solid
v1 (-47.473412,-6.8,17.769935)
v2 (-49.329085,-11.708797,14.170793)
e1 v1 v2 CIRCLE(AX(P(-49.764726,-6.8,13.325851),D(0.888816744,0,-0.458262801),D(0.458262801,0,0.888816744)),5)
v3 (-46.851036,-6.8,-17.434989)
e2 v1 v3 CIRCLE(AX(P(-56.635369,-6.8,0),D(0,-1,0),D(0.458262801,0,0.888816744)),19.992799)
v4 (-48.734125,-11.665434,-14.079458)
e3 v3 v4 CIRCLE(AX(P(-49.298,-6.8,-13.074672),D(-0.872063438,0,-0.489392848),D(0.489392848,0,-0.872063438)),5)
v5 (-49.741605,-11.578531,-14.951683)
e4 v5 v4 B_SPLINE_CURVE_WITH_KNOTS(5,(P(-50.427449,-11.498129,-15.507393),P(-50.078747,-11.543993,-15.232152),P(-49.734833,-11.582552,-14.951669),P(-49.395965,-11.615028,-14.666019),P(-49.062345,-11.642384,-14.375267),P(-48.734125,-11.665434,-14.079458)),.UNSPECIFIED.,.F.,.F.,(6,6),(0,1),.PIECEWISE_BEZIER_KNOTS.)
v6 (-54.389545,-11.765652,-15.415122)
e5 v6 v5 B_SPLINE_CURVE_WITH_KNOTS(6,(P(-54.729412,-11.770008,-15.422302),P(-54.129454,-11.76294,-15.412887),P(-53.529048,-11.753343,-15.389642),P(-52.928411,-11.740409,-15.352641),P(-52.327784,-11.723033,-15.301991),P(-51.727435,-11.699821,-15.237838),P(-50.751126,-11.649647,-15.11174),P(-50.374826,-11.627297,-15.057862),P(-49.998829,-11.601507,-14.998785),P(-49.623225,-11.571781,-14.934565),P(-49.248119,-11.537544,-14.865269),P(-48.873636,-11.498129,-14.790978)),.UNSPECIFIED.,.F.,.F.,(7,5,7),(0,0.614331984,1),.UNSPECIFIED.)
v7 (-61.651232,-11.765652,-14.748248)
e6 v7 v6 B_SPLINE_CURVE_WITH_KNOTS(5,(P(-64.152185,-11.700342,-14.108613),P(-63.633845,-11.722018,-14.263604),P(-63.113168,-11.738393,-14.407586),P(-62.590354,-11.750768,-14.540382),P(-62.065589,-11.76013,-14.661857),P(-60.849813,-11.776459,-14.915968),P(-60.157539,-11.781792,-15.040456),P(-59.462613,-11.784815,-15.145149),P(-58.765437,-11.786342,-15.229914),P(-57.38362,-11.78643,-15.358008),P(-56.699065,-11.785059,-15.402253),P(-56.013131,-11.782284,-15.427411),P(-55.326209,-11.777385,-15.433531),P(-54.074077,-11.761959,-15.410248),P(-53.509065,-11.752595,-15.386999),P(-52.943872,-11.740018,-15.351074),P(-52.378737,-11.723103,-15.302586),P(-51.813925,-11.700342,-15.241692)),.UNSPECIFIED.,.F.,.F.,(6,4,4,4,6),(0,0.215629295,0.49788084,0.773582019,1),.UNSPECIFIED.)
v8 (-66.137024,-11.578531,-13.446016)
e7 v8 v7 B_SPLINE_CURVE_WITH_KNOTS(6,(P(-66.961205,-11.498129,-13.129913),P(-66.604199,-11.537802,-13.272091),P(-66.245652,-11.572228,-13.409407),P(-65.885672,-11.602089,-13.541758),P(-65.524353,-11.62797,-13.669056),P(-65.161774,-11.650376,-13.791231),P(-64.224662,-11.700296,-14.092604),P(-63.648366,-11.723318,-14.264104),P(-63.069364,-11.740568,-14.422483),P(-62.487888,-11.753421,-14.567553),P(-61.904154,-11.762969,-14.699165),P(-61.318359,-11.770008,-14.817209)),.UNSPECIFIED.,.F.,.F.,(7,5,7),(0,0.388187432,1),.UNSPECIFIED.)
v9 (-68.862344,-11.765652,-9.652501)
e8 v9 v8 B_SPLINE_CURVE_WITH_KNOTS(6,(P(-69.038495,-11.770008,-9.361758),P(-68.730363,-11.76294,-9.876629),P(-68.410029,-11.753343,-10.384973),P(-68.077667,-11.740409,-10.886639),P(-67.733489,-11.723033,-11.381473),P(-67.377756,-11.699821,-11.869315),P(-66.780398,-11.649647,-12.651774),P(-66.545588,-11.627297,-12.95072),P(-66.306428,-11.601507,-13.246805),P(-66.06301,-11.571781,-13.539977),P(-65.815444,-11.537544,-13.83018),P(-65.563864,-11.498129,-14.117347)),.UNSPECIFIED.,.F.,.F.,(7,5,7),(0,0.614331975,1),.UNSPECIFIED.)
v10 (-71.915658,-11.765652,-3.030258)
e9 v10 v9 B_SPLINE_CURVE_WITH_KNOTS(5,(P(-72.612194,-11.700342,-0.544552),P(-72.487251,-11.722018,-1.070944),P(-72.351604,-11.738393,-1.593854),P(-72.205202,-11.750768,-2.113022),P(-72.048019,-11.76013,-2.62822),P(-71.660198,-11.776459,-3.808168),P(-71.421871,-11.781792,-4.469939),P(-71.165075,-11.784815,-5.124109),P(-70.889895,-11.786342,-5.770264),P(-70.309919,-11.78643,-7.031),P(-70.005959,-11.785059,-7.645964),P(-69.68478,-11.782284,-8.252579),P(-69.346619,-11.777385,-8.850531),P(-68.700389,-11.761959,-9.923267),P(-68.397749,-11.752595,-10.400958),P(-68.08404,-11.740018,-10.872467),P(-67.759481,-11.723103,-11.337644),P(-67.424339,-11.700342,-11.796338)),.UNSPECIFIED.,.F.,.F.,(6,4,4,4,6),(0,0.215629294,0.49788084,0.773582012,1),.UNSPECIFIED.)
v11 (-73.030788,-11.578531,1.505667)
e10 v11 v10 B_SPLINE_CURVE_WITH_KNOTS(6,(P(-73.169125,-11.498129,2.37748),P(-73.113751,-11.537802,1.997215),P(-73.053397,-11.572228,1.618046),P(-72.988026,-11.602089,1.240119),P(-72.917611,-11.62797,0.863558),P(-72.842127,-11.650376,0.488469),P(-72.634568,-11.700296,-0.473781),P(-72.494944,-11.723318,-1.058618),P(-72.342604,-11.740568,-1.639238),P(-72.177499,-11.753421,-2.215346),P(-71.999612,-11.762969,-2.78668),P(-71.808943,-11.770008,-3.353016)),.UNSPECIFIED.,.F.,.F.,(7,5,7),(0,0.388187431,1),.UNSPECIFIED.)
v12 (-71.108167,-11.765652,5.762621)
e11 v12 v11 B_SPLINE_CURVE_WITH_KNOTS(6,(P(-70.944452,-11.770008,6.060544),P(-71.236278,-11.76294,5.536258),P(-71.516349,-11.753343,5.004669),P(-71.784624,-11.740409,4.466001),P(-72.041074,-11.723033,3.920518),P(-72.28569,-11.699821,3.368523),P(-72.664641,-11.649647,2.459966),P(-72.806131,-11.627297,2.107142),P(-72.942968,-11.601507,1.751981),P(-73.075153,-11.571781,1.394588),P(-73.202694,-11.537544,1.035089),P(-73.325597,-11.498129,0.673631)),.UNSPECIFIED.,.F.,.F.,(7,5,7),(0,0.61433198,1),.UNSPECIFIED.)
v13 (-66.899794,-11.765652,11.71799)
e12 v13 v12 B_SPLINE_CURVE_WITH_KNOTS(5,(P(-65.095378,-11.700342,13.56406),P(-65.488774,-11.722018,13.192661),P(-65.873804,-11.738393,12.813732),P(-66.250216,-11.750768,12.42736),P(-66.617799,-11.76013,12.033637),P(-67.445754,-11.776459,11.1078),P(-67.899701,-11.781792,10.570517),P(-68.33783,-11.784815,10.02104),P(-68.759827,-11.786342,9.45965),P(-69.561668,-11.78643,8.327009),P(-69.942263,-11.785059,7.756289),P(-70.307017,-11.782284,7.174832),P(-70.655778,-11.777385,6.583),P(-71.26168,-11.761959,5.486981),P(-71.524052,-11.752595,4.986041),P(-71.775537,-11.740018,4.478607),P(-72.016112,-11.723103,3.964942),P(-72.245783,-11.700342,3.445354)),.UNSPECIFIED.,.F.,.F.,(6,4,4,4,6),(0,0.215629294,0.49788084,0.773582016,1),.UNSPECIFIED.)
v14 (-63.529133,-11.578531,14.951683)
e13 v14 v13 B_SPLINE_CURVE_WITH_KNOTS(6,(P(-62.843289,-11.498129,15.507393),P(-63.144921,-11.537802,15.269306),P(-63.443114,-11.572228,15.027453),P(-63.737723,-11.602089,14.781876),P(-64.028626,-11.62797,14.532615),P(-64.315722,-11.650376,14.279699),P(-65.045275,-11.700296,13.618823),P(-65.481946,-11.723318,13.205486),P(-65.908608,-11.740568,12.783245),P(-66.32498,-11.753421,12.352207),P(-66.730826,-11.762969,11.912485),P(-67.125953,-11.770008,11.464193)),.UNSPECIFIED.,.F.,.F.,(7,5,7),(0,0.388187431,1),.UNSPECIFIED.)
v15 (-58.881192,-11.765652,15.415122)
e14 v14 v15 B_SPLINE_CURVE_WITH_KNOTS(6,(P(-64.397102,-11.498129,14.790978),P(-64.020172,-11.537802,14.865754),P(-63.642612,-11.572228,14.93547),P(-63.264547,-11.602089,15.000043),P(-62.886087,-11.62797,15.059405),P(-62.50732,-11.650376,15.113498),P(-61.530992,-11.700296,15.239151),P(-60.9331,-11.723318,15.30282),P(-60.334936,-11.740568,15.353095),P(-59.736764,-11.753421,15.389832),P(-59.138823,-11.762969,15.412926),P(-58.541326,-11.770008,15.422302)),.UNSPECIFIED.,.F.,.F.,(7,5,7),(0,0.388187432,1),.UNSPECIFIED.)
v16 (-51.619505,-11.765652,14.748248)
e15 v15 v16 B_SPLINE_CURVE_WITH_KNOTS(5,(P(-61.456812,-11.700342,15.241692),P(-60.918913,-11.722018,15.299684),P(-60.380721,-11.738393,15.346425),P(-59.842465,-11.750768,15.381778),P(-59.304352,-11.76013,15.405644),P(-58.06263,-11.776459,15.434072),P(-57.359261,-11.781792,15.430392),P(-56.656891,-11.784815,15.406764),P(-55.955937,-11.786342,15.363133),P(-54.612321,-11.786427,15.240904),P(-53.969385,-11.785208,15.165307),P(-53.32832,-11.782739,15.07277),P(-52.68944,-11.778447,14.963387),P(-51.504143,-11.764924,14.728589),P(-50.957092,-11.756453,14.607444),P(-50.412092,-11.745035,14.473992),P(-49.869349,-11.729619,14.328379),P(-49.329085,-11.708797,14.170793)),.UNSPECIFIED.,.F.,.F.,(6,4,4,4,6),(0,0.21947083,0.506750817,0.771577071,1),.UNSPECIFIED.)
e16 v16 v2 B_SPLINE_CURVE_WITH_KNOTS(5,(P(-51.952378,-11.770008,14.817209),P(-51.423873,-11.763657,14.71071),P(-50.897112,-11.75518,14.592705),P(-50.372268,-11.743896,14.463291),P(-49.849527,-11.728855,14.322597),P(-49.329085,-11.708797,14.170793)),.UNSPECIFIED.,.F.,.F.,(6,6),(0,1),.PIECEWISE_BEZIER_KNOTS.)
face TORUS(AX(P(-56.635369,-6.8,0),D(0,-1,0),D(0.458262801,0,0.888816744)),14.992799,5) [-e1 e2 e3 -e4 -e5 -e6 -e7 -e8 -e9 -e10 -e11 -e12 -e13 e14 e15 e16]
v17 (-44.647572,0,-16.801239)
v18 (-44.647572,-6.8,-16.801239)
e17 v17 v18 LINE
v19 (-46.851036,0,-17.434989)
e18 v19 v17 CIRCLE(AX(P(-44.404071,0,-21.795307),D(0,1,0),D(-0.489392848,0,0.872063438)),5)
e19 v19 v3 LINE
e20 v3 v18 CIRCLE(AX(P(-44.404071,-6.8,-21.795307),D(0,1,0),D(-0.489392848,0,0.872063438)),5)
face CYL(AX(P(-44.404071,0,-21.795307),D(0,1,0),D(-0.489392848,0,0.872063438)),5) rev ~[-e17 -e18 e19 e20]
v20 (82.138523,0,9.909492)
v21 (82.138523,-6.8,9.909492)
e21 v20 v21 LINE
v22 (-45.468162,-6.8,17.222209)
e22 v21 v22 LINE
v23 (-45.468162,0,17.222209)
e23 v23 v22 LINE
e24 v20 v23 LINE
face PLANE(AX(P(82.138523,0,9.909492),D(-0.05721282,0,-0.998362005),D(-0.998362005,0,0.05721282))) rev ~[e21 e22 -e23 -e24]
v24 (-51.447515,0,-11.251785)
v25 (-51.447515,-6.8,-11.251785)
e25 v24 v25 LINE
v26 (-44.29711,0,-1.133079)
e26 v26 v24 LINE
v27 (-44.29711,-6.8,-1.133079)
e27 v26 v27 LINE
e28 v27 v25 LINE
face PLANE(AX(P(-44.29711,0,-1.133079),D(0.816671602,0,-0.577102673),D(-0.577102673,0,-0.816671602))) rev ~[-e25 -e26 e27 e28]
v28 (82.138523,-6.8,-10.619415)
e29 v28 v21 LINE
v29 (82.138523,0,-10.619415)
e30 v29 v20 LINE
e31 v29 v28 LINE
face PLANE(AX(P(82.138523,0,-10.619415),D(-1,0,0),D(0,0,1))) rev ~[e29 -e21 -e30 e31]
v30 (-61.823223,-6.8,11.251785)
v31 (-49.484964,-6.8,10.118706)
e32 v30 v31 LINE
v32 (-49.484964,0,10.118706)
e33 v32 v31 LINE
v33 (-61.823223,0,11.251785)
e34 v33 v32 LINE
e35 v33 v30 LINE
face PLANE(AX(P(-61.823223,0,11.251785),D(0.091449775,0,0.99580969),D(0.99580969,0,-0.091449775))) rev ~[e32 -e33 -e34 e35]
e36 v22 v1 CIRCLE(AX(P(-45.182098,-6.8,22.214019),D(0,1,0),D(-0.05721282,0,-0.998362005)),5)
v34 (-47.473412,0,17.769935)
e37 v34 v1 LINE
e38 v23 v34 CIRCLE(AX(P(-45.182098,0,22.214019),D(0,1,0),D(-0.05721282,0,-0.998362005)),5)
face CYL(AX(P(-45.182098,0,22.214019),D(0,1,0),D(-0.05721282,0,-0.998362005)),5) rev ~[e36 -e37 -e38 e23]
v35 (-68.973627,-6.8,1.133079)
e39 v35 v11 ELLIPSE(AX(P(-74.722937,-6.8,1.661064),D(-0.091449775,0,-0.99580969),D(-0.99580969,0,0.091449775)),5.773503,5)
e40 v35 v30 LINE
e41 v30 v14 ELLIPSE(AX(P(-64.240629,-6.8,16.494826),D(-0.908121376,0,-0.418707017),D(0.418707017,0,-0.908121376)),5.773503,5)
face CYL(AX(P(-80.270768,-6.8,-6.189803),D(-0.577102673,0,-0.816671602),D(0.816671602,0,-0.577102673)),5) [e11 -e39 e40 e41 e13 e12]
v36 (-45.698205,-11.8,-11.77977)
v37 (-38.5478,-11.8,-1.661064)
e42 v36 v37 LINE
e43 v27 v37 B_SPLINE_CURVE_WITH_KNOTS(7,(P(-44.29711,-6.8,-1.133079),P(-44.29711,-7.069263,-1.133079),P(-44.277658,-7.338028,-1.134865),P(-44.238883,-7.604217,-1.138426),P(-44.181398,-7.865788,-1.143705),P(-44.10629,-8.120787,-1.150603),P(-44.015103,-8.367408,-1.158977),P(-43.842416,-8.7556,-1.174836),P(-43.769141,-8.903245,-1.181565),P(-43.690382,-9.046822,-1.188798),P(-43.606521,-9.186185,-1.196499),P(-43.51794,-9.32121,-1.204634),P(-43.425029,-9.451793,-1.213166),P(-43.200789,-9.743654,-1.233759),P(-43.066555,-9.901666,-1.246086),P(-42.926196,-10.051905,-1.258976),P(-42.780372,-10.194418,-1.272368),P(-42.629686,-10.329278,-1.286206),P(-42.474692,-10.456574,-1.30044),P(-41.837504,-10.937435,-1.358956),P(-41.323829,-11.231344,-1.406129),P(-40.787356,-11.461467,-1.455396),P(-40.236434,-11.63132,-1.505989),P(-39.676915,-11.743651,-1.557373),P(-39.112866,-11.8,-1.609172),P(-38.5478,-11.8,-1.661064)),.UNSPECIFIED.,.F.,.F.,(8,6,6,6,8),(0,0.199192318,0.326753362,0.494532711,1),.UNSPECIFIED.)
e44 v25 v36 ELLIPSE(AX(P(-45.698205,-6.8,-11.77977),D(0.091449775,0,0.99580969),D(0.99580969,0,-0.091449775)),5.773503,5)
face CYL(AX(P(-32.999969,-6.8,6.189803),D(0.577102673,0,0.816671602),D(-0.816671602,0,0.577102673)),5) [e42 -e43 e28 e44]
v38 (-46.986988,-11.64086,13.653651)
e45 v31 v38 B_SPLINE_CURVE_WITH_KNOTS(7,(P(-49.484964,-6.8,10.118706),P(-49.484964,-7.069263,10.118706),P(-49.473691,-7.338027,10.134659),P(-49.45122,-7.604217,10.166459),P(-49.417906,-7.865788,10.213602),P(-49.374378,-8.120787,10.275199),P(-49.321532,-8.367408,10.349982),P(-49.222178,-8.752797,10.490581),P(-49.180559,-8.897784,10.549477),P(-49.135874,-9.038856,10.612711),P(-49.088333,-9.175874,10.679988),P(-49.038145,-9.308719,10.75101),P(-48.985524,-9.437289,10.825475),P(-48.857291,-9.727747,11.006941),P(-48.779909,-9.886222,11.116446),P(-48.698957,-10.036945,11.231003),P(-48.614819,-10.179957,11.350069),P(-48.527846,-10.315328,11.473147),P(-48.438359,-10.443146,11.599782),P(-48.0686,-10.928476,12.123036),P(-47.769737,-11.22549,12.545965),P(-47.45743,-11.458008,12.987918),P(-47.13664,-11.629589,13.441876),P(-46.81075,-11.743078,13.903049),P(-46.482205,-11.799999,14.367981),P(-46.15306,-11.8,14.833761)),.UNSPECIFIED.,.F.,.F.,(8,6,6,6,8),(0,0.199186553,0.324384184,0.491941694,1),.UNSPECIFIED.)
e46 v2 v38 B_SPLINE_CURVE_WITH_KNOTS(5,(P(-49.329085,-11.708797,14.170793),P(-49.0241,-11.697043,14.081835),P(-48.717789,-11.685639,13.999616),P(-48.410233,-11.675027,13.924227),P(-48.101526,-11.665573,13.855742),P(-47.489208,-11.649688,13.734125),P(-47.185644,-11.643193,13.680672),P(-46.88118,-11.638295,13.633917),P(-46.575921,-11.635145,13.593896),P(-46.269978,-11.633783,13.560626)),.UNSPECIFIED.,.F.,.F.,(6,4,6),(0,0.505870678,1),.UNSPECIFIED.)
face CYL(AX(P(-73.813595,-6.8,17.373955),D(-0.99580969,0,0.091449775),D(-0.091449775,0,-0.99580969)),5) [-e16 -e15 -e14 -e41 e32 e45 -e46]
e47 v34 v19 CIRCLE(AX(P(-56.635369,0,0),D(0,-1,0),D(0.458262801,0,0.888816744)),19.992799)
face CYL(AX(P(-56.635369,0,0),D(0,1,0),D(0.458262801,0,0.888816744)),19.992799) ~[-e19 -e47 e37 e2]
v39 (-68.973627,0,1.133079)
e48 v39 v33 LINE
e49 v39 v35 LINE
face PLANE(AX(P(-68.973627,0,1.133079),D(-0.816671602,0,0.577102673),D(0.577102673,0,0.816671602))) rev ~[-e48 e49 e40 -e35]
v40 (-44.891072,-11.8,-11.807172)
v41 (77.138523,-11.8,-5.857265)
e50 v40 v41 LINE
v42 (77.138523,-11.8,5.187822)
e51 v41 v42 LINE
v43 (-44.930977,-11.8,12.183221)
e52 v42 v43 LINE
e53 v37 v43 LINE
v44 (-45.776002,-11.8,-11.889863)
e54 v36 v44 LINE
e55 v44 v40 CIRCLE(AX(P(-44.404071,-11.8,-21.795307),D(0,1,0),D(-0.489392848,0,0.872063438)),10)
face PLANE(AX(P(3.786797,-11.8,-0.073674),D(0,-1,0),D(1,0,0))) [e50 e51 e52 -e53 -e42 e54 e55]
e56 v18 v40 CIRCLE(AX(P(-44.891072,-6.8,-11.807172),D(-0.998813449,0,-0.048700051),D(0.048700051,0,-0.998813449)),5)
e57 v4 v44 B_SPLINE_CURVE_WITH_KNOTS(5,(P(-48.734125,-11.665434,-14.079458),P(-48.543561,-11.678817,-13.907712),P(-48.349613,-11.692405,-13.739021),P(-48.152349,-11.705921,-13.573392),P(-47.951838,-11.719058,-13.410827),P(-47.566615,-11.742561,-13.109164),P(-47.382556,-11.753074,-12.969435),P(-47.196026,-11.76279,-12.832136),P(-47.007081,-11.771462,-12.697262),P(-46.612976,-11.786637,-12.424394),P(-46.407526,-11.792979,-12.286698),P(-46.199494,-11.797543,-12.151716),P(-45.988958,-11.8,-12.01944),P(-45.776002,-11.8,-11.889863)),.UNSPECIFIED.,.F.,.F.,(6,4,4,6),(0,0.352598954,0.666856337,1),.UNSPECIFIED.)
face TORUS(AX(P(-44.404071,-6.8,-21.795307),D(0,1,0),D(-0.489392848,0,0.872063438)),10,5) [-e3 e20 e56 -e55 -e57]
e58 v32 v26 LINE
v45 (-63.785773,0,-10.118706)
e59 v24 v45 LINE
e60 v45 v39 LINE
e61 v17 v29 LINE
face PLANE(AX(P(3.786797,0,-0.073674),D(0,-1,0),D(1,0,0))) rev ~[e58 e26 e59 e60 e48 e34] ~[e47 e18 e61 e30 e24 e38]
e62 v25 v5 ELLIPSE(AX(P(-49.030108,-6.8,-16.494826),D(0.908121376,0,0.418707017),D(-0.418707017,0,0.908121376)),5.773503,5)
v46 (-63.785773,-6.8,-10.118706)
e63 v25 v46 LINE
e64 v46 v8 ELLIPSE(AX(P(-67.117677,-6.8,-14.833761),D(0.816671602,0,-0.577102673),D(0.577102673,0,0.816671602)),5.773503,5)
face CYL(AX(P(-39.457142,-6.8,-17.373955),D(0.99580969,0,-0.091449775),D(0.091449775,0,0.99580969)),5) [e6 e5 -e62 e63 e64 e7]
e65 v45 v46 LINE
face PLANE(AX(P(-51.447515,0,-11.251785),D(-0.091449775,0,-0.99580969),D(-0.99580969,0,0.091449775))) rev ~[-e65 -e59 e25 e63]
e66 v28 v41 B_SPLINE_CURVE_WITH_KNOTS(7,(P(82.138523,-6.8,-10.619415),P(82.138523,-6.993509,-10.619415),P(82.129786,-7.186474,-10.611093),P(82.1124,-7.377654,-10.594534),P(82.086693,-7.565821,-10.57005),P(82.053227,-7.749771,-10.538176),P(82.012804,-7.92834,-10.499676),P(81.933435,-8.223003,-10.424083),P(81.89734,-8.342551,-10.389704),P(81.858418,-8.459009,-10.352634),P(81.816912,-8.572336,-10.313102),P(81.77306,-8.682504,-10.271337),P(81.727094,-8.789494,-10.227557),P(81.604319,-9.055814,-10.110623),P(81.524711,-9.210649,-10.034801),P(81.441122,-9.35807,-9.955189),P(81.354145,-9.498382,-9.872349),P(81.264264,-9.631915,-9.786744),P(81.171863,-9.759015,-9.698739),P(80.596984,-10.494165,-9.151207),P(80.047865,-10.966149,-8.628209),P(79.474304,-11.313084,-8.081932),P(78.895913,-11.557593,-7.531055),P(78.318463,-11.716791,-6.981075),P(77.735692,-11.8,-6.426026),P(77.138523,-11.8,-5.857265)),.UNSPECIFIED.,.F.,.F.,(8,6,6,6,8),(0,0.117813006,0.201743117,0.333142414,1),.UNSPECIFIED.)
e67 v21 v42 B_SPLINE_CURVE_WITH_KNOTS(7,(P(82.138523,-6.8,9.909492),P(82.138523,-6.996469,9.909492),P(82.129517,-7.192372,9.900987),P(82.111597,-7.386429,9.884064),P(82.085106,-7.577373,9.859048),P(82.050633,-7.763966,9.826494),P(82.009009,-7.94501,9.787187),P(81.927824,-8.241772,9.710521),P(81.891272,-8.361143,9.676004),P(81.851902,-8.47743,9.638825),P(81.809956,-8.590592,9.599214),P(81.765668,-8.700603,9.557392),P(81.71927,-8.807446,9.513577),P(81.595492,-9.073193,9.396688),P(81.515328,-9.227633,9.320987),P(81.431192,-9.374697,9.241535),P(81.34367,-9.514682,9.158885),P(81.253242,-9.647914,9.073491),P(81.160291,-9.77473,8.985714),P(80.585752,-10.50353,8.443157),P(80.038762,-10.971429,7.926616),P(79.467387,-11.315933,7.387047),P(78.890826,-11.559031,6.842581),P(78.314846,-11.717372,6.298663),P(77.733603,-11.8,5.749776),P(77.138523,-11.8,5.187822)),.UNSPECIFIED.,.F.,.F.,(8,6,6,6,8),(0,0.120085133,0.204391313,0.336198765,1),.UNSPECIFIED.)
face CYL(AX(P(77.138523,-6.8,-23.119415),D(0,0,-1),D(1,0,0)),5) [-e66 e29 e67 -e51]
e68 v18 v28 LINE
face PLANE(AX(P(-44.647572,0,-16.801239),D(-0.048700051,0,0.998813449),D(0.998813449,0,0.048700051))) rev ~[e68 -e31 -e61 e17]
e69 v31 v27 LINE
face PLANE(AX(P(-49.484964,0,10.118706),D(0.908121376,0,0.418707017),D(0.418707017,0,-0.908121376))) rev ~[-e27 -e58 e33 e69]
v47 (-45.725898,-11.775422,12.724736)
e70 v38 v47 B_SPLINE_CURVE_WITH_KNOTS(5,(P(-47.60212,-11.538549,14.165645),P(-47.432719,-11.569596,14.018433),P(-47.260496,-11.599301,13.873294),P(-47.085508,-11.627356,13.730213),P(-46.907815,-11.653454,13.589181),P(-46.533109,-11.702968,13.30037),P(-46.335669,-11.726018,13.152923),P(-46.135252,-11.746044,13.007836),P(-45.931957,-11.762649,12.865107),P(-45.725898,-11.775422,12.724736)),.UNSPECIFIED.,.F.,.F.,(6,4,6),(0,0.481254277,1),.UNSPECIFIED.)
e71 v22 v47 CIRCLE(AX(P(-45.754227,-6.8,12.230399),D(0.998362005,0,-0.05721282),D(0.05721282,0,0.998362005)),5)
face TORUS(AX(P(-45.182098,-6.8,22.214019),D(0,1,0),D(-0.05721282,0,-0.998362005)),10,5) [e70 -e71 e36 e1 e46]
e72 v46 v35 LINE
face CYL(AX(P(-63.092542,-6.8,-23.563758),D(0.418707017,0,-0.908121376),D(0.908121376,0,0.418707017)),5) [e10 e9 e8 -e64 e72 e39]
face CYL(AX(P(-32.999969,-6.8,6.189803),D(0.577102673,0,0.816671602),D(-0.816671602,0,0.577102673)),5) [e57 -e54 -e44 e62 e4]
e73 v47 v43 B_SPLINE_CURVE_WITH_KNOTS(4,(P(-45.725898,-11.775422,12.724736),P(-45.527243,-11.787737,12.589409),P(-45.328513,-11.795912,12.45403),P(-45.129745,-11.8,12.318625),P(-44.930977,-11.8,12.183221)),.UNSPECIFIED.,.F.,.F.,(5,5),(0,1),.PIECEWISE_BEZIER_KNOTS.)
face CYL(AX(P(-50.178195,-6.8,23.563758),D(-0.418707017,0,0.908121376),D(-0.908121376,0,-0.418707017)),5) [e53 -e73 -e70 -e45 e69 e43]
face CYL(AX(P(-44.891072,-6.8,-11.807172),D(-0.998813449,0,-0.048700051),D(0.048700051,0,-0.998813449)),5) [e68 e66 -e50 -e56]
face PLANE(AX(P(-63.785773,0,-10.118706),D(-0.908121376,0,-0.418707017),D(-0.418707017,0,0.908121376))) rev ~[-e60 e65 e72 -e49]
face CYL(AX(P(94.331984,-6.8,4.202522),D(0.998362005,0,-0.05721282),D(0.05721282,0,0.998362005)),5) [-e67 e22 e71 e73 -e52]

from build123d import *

# Parameters (mm, degrees)
F1_DEPTH      = 11.8
F2_T3_ANGLE   = 23.9952218253
F2_T6_ANGLE   = 236.5757489995
F2_T9_ANGLE   = 26.5092715393
F2_T12_DEPTH  = 139.4367119933
F2_T15_DEPTH  = 45.5289069563
F2_T18_DEPTH  = 140.3160479541
F2_T21_DEPTH  = 37.3901770892
F2_T26_DEPTH  = 37.3901770892
F2_T31_DEPTH  = 37.3901770892
F2_T36_DEPTH  = 37.3901770892
F2_T41_DEPTH  = 37.3901770892
F2_T46_DEPTH  = 37.3901770892
F2_T52_DEPTH  = 37.3901770892
F2_T56_DEPTH  = 37.3901770892
F2_T62_DEPTH  = 37.3901770892
F2_T66_DEPTH  = 37.3901770892
F2_T72_DEPTH  = 37.3901770892
F2_T76_DEPTH  = 37.3901770892
F2_T82_DEPTH  = 37.3901770892
F2_T86_DEPTH  = 37.3901770892
F2_T92_DEPTH  = 37.3901770892
F2_T96_DEPTH  = 37.3901770892
F2_T102_DEPTH = 37.3901770892
F2_T106_DEPTH = 37.3901770892


# Not quite as in the source:
# - a fillet or chamfer that OpenCascade refuses, or shapes differently, is made with other operations: its cross-section is extruded or revolved along the edge and cut away or added


with BuildPart() as f1:
    # F0 (on Front) → F1 (new body)
    with BuildSketch(Plane.XZ):
        with BuildLine():
            ThreePointArc((-45.4681624589, 17.2222085509), (-46.4995658162, 17.3907127083), (-47.4734123647, 17.7699348549))
            ThreePointArc((-47.4734123647, 17.7699348549), (-76.6250444945, -0.3533911925), (-46.8510355825, -17.4349893659))
            ThreePointArc((-46.8510355825, -17.4349893659), (-45.7861203938, -16.9901072457), (-44.6475715962, -16.8012393137))
            Line((-44.6475715962, -16.8012393137), (82.1385234594, -10.6194149703))
            Line((82.1385234594, -10.6194149703), (82.1385234594, 9.909491986))
            Line((82.1385234594, 9.909491986), (-45.4681624589, 17.2222085509))
        make_face()
        Polygon((-49.4849642992, 10.1187057679), (-44.2971102089, -1.1330789012), (-51.4475145251, -11.2517846691), (-63.7857729316, -10.1187057679), (-68.9736270219, 1.1330789012), (-61.8232227057, 11.2517846691), align=None, mode=Mode.SUBTRACT)
    extrude(amount=F1_DEPTH)

    # F2: fillet of radius 5 on 12 edges, made by hand


with BuildPart() as f2_tool1:
    # F2_s2 → F2_t3 (revolve)
    with BuildSketch(Plane(origin=(-46.3030483671, 0, 2.6534743565), x_dir=(0, 1, 0), z_dir=(0.9983620051, 0, -0.0572128202))):
        with BuildLine():
            ThreePointArc((-6.8, 14.5926368593), (-10.3355339059, 13.1281707652), (-11.8, 9.5926368593))
            Line((-11.8, 9.5926368593), (-11.8, 14.5926368593))
            Line((-11.8, 14.5926368593), (-6.8, 14.5926368593))
        make_face()
    revolve(axis=Axis((-45.1820983581, -11.8, 22.2140185763), (0, 1, 0)), revolution_arc=F2_T3_ANGLE)


with BuildPart() as f2_tool4:
    # F2_s5 → F2_t6 (revolve)
    with BuildSketch(Plane(origin=(-44.7416696351, 0, 23.0682455015), x_dir=(0, 1, 0), z_dir=(0.8888167443, 0, -0.4582628013))):
        with BuildLine():
            ThreePointArc((-6.8, -5.9610832949), (-10.3355339059, -7.425549389), (-11.8, -10.9610832949))
            Line((-11.8, -10.9610832949), (-11.8, -5.9610832949))
            Line((-11.8, -5.9610832949), (-6.8, -5.9610832949))
        make_face()
    revolve(axis=Axis((-56.6353686154, -11.8, 0), (0, -1, 0)), revolution_arc=F2_T6_ANGLE)


with BuildPart() as f2_tool7:
    # F2_s8 → F2_t9 (revolve)
    with BuildSketch(Plane(origin=(-43.0708942729, 0, -24.1709337899), x_dir=(0, 1, 0), z_dir=(-0.8720634381, 0, -0.4893928482))):
        with BuildLine():
            ThreePointArc((-6.8, -7.7241449756), (-10.3355339059, -9.1886110696), (-11.8, -12.7241449756))
            Line((-11.8, -12.7241449756), (-11.8, -7.7241449756))
            Line((-11.8, -7.7241449756), (-6.8, -7.7241449756))
        make_face()
    revolve(axis=Axis((-44.4040713414, -11.8, -21.7953065565), (0, 1, 0)), revolution_arc=F2_T9_ANGLE)


with BuildPart() as f2_tool10:
    # F2_s11 → F2_t12 (new body)
    with BuildSketch(Plane(origin=(-45.3589315248, 0, -2.2116064618), x_dir=(0, 1, 0), z_dir=(0.9988134486, 0, 0.048700051))):
        with BuildLine():
            ThreePointArc((-6.8, -14.6069647669), (-10.3355339059, -13.1424986728), (-11.8, -9.6069647669))
            Line((-11.8, -9.6069647669), (-11.8, -14.6069647669))
            Line((-11.8, -14.6069647669), (-6.8, -14.6069647669))
        make_face()
    extrude(amount=F2_T12_DEPTH)


with BuildPart() as f2_tool13:
    # F2_s14 → F2_t15 (new body)
    with BuildSketch(Plane.XY.offset(-23.1194149703)):
        with BuildLine():
            ThreePointArc((82.1385234594, -6.8), (80.6740573654, -10.3355339059), (77.1385234594, -11.8))
            Line((77.1385234594, -11.8), (82.1385234594, -11.8))
            Line((82.1385234594, -11.8), (82.1385234594, -6.8))
        make_face()
    extrude(amount=F2_T15_DEPTH)


with BuildPart() as f2_tool16:
    # F2_s17 → F2_t18 (new body)
    with BuildSketch(Plane(origin=(93.7831626148, 0, -5.3744024604), x_dir=(0, 1, 0), z_dir=(-0.9983620051, 0, 0.0572128202))):
        with BuildLine():
            ThreePointArc((-6.8, -14.5926368593), (-10.3355339059, -13.1281707652), (-11.8, -9.5926368593))
            Line((-11.8, -9.5926368593), (-11.8, -14.5926368593))
            Line((-11.8, -14.5926368593), (-6.8, -14.5926368593))
        make_face()
    extrude(amount=F2_T18_DEPTH)


with BuildPart() as f2_tool19:
    # F2_s20 → F2_t21 (new body)
    with BuildSketch(Plane(origin=(-29.6512532209, 0, -41.9601876654), x_dir=(0, 1, 0), z_dir=(0.5771026729, 0, 0.8166716016))):
        with BuildLine():
            ThreePointArc((-6.8, 56.9827053125), (-10.3355339059, 58.4471714066), (-11.8, 61.9827053125))
            Line((-11.8, 61.9827053125), (-11.8, 56.9827053125))
            Line((-11.8, 56.9827053125), (-6.8, 56.9827053125))
        make_face()
    extrude(amount=F2_T21_DEPTH)

    split(bisect_by=Plane(origin=(-56.450638263, 0, -26.0276643418), x_dir=(0, 1, 0), z_dir=(0.9081213762, 0, 0.4187070171)), keep=Keep.TOP)

    split(bisect_by=Plane(origin=(0.5076300556, 0, 5.5276563658), x_dir=(0, 1, 0), z_dir=(-0.0914497745, 0, -0.99580969)), keep=Keep.TOP)


with BuildPart() as f2_tool24:
    # F2_s25 → F2_t26 (new body)
    with BuildSketch(Plane(origin=(-74.7784738866, 0, 6.867250485), x_dir=(0, 1, 0), z_dir=(0.99580969, 0, -0.0914497745))):
        with BuildLine():
            ThreePointArc((-6.8, 5.5509164263), (-10.3355339059, 7.0153825204), (-11.8, 10.5509164263))
            Line((-11.8, 10.5509164263), (-11.8, 5.5509164263))
            Line((-11.8, 5.5509164263), (-6.8, 5.5509164263))
        make_face()
    extrude(amount=F2_T26_DEPTH)

    split(bisect_by=Plane(origin=(-46.5361572126, 0, 32.8848715463), x_dir=(0, 1, 0), z_dir=(0.8166716016, 0, -0.5771026729)), keep=Keep.TOP)

    split(bisect_by=Plane(origin=(-36.9619755402, 0, -17.0420374751), x_dir=(0, 1, 0), z_dir=(-0.9081213762, 0, -0.4187070171)), keep=Keep.TOP)


with BuildPart() as f2_tool29:
    # F2_s30 → F2_t31 (new body)
    with BuildSketch(Plane(origin=(-17.7568264726, 0, 38.512260445), x_dir=(0, 1, 0), z_dir=(0.4187070171, 0, -0.9081213762))):
        with BuildLine():
            ThreePointArc((-6.8, -40.7015807695), (-10.3355339059, -39.2371146755), (-11.8, -35.7015807695))
            Line((-11.8, -35.7015807695), (-11.8, -40.7015807695))
            Line((-11.8, -40.7015807695), (-6.8, -40.7015807695))
        make_face()
    extrude(amount=F2_T31_DEPTH)

    split(bisect_by=Plane(origin=(0.5076300556, 0, 5.5276563658), x_dir=(0, 1, 0), z_dir=(-0.0914497745, 0, -0.99580969)), keep=Keep.TOP)

    split(bisect_by=Plane(origin=(-29.0100447157, 0, 20.500007976), x_dir=(0, 1, 0), z_dir=(-0.8166716016, 0, 0.5771026729)), keep=Keep.TOP)


with BuildPart() as f2_tool34:
    # F2_s35 → F2_t36 (new body)
    with BuildSketch(Plane(origin=(-8.0732820816, 0, -11.4246918569), x_dir=(0, 1, 0), z_dir=(-0.5771026729, 0, -0.8166716016))):
        with BuildLine():
            ThreePointArc((-6.8, -35.5222890792), (-10.3355339059, -34.0578229851), (-11.8, -30.5222890792))
            Line((-11.8, -30.5222890792), (-11.8, -35.5222890792))
            Line((-11.8, -35.5222890792), (-6.8, -35.5222890792))
        make_face()
    extrude(amount=F2_T36_DEPTH)

    split(bisect_by=Plane(origin=(-36.9619755402, 0, -17.0420374751), x_dir=(0, 1, 0), z_dir=(-0.9081213762, 0, -0.4187070171)), keep=Keep.TOP)

    split(bisect_by=Plane(origin=(-1.4549201703, 0, -15.8428340712), x_dir=(0, 1, 0), z_dir=(0.0914497745, 0, 0.99580969)), keep=Keep.TOP)


with BuildPart() as f2_tool39:
    # F2_s40 → F2_t41 (new body)
    with BuildSketch(Plane(origin=(-37.5449732296, 0, 3.4479272205), x_dir=(0, 1, 0), z_dir=(-0.99580969, 0, 0.0914497745))):
        with BuildLine():
            ThreePointArc((-6.8, 15.909499807), (-10.3355339059, 17.3739659011), (-11.8, 20.909499807))
            Line((-11.8, 20.909499807), (-11.8, 15.909499807))
            Line((-11.8, 15.909499807), (-6.8, 15.909499807))
        make_face()
    extrude(amount=F2_T41_DEPTH)

    split(bisect_by=Plane(origin=(-29.0100447157, 0, 20.500007976), x_dir=(0, 1, 0), z_dir=(-0.8166716016, 0, 0.5771026729)), keep=Keep.TOP)

    split(bisect_by=Plane(origin=(-56.450638263, 0, -26.0276643418), x_dir=(0, 1, 0), z_dir=(0.9081213762, 0, 0.4187070171)), keep=Keep.TOP)


with BuildPart() as f2_tool44:
    # F2_s45 → F2_t46 (new body)
    with BuildSketch(Plane(origin=(-2.1012969549, 0, 4.5574413719), x_dir=(0, 1, 0), z_dir=(-0.4187070171, 0, 0.9081213762))):
        with BuildLine():
            ThreePointArc((-6.8, 62.1619970029), (-10.3355339059, 63.626463097), (-11.8, 67.1619970029))
            Line((-11.8, 67.1619970029), (-11.8, 62.1619970029))
            Line((-11.8, 62.1619970029), (-6.8, 62.1619970029))
        make_face()
    extrude(amount=F2_T46_DEPTH)

    split(bisect_by=Plane(origin=(-46.5361572126, 0, 32.8848715463), x_dir=(0, 1, 0), z_dir=(0.8166716016, 0, -0.5771026729)), keep=Keep.TOP)

    split(bisect_by=Plane(origin=(-1.4549201703, 0, -15.8428340712), x_dir=(0, 1, 0), z_dir=(0.0914497745, 0, 0.99580969)), keep=Keep.TOP)


with BuildPart() as f2_tool50:
    # F2_s51 → F2_t52 (new body)
    with BuildSketch(Plane(origin=(-29.6512532209, 0, -41.9601876654), x_dir=(0, 1, 0), z_dir=(0.5771026729, 0, 0.8166716016))):
        with BuildLine():
            ThreePointArc((-6.8, 56.9827053125), (-10.3355339059, 58.4471714066), (-11.8, 61.9827053125))
            Line((-11.8, 61.9827053125), (-11.8, 56.9827053125))
            Line((-11.8, 56.9827053125), (-6.8, 56.9827053125))
        make_face()
    extrude(amount=F2_T52_DEPTH)

    split(bisect_by=Plane(origin=(-56.450638263, 0, -26.0276643418), x_dir=(0, 1, 0), z_dir=(-0.9081213762, 0, -0.4187070171)), keep=Keep.TOP)


with BuildPart() as f2_tool54:
    # F2_s55 → F2_t56 (new body)
    with BuildSketch(Plane(origin=(-2.1012969549, 0, 4.5574413719), x_dir=(0, 1, 0), z_dir=(-0.4187070171, 0, 0.9081213762))):
        with BuildLine():
            ThreePointArc((-6.8, 62.1619970029), (-10.3355339059, 63.626463097), (-11.8, 67.1619970029))
            Line((-11.8, 67.1619970029), (-11.8, 62.1619970029))
            Line((-11.8, 62.1619970029), (-6.8, 62.1619970029))
        make_face()
    extrude(amount=F2_T56_DEPTH)

    split(bisect_by=Plane(origin=(-46.5361572126, 0, 32.8848715463), x_dir=(0, 1, 0), z_dir=(-0.8166716016, 0, 0.5771026729)), keep=Keep.TOP)


with BuildPart() as f2_tool50_1:
    add(f2_tool50.part)

    # F2_t58: intersect F2_tool54
    add(f2_tool54.part, mode=Mode.INTERSECT)


with BuildPart() as f2_tool60:
    # F2_s61 → F2_t62 (new body)
    with BuildSketch(Plane(origin=(-29.6512532209, 0, -41.9601876654), x_dir=(0, 1, 0), z_dir=(0.5771026729, 0, 0.8166716016))):
        with BuildLine():
            ThreePointArc((-6.8, 56.9827053125), (-10.3355339059, 58.4471714066), (-11.8, 61.9827053125))
            Line((-11.8, 61.9827053125), (-11.8, 56.9827053125))
            Line((-11.8, 56.9827053125), (-6.8, 56.9827053125))
        make_face()
    extrude(amount=F2_T62_DEPTH)

    split(bisect_by=Plane(origin=(0.5076300556, 0, 5.5276563658), x_dir=(0, 1, 0), z_dir=(0.0914497745, 0, 0.99580969)), keep=Keep.TOP)


with BuildPart() as f2_tool64:
    # F2_s65 → F2_t66 (new body)
    with BuildSketch(Plane(origin=(-74.7784738866, 0, 6.867250485), x_dir=(0, 1, 0), z_dir=(0.99580969, 0, -0.0914497745))):
        with BuildLine():
            ThreePointArc((-6.8, 5.5509164263), (-10.3355339059, 7.0153825204), (-11.8, 10.5509164263))
            Line((-11.8, 10.5509164263), (-11.8, 5.5509164263))
            Line((-11.8, 5.5509164263), (-6.8, 5.5509164263))
        make_face()
    extrude(amount=F2_T66_DEPTH)

    split(bisect_by=Plane(origin=(-46.5361572126, 0, 32.8848715463), x_dir=(0, 1, 0), z_dir=(-0.8166716016, 0, 0.5771026729)), keep=Keep.TOP)


with BuildPart() as f2_tool60_1:
    add(f2_tool60.part)

    # F2_t68: intersect F2_tool64
    add(f2_tool64.part, mode=Mode.INTERSECT)


with BuildPart() as f2_tool70:
    # F2_s71 → F2_t72 (new body)
    with BuildSketch(Plane(origin=(-74.7784738866, 0, 6.867250485), x_dir=(0, 1, 0), z_dir=(0.99580969, 0, -0.0914497745))):
        with BuildLine():
            ThreePointArc((-6.8, 5.5509164263), (-10.3355339059, 7.0153825204), (-11.8, 10.5509164263))
            Line((-11.8, 10.5509164263), (-11.8, 5.5509164263))
            Line((-11.8, 5.5509164263), (-6.8, 5.5509164263))
        make_face()
    extrude(amount=F2_T72_DEPTH)

    split(bisect_by=Plane(origin=(-36.9619755402, 0, -17.0420374751), x_dir=(0, 1, 0), z_dir=(0.9081213762, 0, 0.4187070171)), keep=Keep.TOP)


with BuildPart() as f2_tool74:
    # F2_s75 → F2_t76 (new body)
    with BuildSketch(Plane(origin=(-17.7568264726, 0, 38.512260445), x_dir=(0, 1, 0), z_dir=(0.4187070171, 0, -0.9081213762))):
        with BuildLine():
            ThreePointArc((-6.8, -40.7015807695), (-10.3355339059, -39.2371146755), (-11.8, -35.7015807695))
            Line((-11.8, -35.7015807695), (-11.8, -40.7015807695))
            Line((-11.8, -40.7015807695), (-6.8, -40.7015807695))
        make_face()
    extrude(amount=F2_T76_DEPTH)

    split(bisect_by=Plane(origin=(0.5076300556, 0, 5.5276563658), x_dir=(0, 1, 0), z_dir=(0.0914497745, 0, 0.99580969)), keep=Keep.TOP)


with BuildPart() as f2_tool70_1:
    add(f2_tool70.part)

    # F2_t78: intersect F2_tool74
    add(f2_tool74.part, mode=Mode.INTERSECT)


with BuildPart() as f2_tool80:
    # F2_s81 → F2_t82 (new body)
    with BuildSketch(Plane(origin=(-17.7568264726, 0, 38.512260445), x_dir=(0, 1, 0), z_dir=(0.4187070171, 0, -0.9081213762))):
        with BuildLine():
            ThreePointArc((-6.8, -40.7015807695), (-10.3355339059, -39.2371146755), (-11.8, -35.7015807695))
            Line((-11.8, -35.7015807695), (-11.8, -40.7015807695))
            Line((-11.8, -40.7015807695), (-6.8, -40.7015807695))
        make_face()
    extrude(amount=F2_T82_DEPTH)

    split(bisect_by=Plane(origin=(-29.0100447157, 0, 20.500007976), x_dir=(0, 1, 0), z_dir=(0.8166716016, 0, -0.5771026729)), keep=Keep.TOP)


with BuildPart() as f2_tool84:
    # F2_s85 → F2_t86 (new body)
    with BuildSketch(Plane(origin=(-8.0732820816, 0, -11.4246918569), x_dir=(0, 1, 0), z_dir=(-0.5771026729, 0, -0.8166716016))):
        with BuildLine():
            ThreePointArc((-6.8, -35.5222890792), (-10.3355339059, -34.0578229851), (-11.8, -30.5222890792))
            Line((-11.8, -30.5222890792), (-11.8, -35.5222890792))
            Line((-11.8, -35.5222890792), (-6.8, -35.5222890792))
        make_face()
    extrude(amount=F2_T86_DEPTH)

    split(bisect_by=Plane(origin=(-36.9619755402, 0, -17.0420374751), x_dir=(0, 1, 0), z_dir=(0.9081213762, 0, 0.4187070171)), keep=Keep.TOP)


with BuildPart() as f2_tool80_1:
    add(f2_tool80.part)

    # F2_t88: intersect F2_tool84
    add(f2_tool84.part, mode=Mode.INTERSECT)


with BuildPart() as f2_tool90:
    # F2_s91 → F2_t92 (new body)
    with BuildSketch(Plane(origin=(-8.0732820816, 0, -11.4246918569), x_dir=(0, 1, 0), z_dir=(-0.5771026729, 0, -0.8166716016))):
        with BuildLine():
            ThreePointArc((-6.8, -35.5222890792), (-10.3355339059, -34.0578229851), (-11.8, -30.5222890792))
            Line((-11.8, -30.5222890792), (-11.8, -35.5222890792))
            Line((-11.8, -35.5222890792), (-6.8, -35.5222890792))
        make_face()
    extrude(amount=F2_T92_DEPTH)

    split(bisect_by=Plane(origin=(-1.4549201703, 0, -15.8428340712), x_dir=(0, 1, 0), z_dir=(-0.0914497745, 0, -0.99580969)), keep=Keep.TOP)


with BuildPart() as f2_tool94:
    # F2_s95 → F2_t96 (new body)
    with BuildSketch(Plane(origin=(-37.5449732296, 0, 3.4479272205), x_dir=(0, 1, 0), z_dir=(-0.99580969, 0, 0.0914497745))):
        with BuildLine():
            ThreePointArc((-6.8, 15.909499807), (-10.3355339059, 17.3739659011), (-11.8, 20.909499807))
            Line((-11.8, 20.909499807), (-11.8, 15.909499807))
            Line((-11.8, 15.909499807), (-6.8, 15.909499807))
        make_face()
    extrude(amount=F2_T96_DEPTH)

    split(bisect_by=Plane(origin=(-29.0100447157, 0, 20.500007976), x_dir=(0, 1, 0), z_dir=(0.8166716016, 0, -0.5771026729)), keep=Keep.TOP)


with BuildPart() as f2_tool90_1:
    add(f2_tool90.part)

    # F2_t98: intersect F2_tool94
    add(f2_tool94.part, mode=Mode.INTERSECT)


with BuildPart() as f2_tool100:
    # F2_s101 → F2_t102 (new body)
    with BuildSketch(Plane(origin=(-37.5449732296, 0, 3.4479272205), x_dir=(0, 1, 0), z_dir=(-0.99580969, 0, 0.0914497745))):
        with BuildLine():
            ThreePointArc((-6.8, 15.909499807), (-10.3355339059, 17.3739659011), (-11.8, 20.909499807))
            Line((-11.8, 20.909499807), (-11.8, 15.909499807))
            Line((-11.8, 15.909499807), (-6.8, 15.909499807))
        make_face()
    extrude(amount=F2_T102_DEPTH)

    split(bisect_by=Plane(origin=(-56.450638263, 0, -26.0276643418), x_dir=(0, 1, 0), z_dir=(-0.9081213762, 0, -0.4187070171)), keep=Keep.TOP)


with BuildPart() as f2_tool104:
    # F2_s105 → F2_t106 (new body)
    with BuildSketch(Plane(origin=(-2.1012969549, 0, 4.5574413719), x_dir=(0, 1, 0), z_dir=(-0.4187070171, 0, 0.9081213762))):
        with BuildLine():
            ThreePointArc((-6.8, 62.1619970029), (-10.3355339059, 63.626463097), (-11.8, 67.1619970029))
            Line((-11.8, 67.1619970029), (-11.8, 62.1619970029))
            Line((-11.8, 62.1619970029), (-6.8, 62.1619970029))
        make_face()
    extrude(amount=F2_T106_DEPTH)

    split(bisect_by=Plane(origin=(-1.4549201703, 0, -15.8428340712), x_dir=(0, 1, 0), z_dir=(-0.0914497745, 0, -0.99580969)), keep=Keep.TOP)


with BuildPart() as f2_tool100_1:
    add(f2_tool100.part)

    # F2_t108: intersect F2_tool104
    add(f2_tool104.part, mode=Mode.INTERSECT)


with BuildPart() as f1_1:
    add(f1.part)

    # F2_t109: cut F2_tool1, F2_tool4, F2_tool7, F2_tool10, F2_tool13, F2_tool16, F2_tool19, F2_tool24, F2_tool29, F2_tool34, F2_tool39, F2_tool44, F2_tool50, F2_tool60, F2_tool70, F2_tool80, F2_tool90, F2_tool100
    add([f2_tool1.part, f2_tool4.part, f2_tool7.part, f2_tool10.part, f2_tool13.part, f2_tool16.part, f2_tool19.part, f2_tool24.part, f2_tool29.part, f2_tool34.part, f2_tool39.part, f2_tool44.part, f2_tool50_1.part, f2_tool60_1.part, f2_tool70_1.part, f2_tool80_1.part, f2_tool90_1.part, f2_tool100_1.part], mode=Mode.SUBTRACT)


solid = f1_1.part
